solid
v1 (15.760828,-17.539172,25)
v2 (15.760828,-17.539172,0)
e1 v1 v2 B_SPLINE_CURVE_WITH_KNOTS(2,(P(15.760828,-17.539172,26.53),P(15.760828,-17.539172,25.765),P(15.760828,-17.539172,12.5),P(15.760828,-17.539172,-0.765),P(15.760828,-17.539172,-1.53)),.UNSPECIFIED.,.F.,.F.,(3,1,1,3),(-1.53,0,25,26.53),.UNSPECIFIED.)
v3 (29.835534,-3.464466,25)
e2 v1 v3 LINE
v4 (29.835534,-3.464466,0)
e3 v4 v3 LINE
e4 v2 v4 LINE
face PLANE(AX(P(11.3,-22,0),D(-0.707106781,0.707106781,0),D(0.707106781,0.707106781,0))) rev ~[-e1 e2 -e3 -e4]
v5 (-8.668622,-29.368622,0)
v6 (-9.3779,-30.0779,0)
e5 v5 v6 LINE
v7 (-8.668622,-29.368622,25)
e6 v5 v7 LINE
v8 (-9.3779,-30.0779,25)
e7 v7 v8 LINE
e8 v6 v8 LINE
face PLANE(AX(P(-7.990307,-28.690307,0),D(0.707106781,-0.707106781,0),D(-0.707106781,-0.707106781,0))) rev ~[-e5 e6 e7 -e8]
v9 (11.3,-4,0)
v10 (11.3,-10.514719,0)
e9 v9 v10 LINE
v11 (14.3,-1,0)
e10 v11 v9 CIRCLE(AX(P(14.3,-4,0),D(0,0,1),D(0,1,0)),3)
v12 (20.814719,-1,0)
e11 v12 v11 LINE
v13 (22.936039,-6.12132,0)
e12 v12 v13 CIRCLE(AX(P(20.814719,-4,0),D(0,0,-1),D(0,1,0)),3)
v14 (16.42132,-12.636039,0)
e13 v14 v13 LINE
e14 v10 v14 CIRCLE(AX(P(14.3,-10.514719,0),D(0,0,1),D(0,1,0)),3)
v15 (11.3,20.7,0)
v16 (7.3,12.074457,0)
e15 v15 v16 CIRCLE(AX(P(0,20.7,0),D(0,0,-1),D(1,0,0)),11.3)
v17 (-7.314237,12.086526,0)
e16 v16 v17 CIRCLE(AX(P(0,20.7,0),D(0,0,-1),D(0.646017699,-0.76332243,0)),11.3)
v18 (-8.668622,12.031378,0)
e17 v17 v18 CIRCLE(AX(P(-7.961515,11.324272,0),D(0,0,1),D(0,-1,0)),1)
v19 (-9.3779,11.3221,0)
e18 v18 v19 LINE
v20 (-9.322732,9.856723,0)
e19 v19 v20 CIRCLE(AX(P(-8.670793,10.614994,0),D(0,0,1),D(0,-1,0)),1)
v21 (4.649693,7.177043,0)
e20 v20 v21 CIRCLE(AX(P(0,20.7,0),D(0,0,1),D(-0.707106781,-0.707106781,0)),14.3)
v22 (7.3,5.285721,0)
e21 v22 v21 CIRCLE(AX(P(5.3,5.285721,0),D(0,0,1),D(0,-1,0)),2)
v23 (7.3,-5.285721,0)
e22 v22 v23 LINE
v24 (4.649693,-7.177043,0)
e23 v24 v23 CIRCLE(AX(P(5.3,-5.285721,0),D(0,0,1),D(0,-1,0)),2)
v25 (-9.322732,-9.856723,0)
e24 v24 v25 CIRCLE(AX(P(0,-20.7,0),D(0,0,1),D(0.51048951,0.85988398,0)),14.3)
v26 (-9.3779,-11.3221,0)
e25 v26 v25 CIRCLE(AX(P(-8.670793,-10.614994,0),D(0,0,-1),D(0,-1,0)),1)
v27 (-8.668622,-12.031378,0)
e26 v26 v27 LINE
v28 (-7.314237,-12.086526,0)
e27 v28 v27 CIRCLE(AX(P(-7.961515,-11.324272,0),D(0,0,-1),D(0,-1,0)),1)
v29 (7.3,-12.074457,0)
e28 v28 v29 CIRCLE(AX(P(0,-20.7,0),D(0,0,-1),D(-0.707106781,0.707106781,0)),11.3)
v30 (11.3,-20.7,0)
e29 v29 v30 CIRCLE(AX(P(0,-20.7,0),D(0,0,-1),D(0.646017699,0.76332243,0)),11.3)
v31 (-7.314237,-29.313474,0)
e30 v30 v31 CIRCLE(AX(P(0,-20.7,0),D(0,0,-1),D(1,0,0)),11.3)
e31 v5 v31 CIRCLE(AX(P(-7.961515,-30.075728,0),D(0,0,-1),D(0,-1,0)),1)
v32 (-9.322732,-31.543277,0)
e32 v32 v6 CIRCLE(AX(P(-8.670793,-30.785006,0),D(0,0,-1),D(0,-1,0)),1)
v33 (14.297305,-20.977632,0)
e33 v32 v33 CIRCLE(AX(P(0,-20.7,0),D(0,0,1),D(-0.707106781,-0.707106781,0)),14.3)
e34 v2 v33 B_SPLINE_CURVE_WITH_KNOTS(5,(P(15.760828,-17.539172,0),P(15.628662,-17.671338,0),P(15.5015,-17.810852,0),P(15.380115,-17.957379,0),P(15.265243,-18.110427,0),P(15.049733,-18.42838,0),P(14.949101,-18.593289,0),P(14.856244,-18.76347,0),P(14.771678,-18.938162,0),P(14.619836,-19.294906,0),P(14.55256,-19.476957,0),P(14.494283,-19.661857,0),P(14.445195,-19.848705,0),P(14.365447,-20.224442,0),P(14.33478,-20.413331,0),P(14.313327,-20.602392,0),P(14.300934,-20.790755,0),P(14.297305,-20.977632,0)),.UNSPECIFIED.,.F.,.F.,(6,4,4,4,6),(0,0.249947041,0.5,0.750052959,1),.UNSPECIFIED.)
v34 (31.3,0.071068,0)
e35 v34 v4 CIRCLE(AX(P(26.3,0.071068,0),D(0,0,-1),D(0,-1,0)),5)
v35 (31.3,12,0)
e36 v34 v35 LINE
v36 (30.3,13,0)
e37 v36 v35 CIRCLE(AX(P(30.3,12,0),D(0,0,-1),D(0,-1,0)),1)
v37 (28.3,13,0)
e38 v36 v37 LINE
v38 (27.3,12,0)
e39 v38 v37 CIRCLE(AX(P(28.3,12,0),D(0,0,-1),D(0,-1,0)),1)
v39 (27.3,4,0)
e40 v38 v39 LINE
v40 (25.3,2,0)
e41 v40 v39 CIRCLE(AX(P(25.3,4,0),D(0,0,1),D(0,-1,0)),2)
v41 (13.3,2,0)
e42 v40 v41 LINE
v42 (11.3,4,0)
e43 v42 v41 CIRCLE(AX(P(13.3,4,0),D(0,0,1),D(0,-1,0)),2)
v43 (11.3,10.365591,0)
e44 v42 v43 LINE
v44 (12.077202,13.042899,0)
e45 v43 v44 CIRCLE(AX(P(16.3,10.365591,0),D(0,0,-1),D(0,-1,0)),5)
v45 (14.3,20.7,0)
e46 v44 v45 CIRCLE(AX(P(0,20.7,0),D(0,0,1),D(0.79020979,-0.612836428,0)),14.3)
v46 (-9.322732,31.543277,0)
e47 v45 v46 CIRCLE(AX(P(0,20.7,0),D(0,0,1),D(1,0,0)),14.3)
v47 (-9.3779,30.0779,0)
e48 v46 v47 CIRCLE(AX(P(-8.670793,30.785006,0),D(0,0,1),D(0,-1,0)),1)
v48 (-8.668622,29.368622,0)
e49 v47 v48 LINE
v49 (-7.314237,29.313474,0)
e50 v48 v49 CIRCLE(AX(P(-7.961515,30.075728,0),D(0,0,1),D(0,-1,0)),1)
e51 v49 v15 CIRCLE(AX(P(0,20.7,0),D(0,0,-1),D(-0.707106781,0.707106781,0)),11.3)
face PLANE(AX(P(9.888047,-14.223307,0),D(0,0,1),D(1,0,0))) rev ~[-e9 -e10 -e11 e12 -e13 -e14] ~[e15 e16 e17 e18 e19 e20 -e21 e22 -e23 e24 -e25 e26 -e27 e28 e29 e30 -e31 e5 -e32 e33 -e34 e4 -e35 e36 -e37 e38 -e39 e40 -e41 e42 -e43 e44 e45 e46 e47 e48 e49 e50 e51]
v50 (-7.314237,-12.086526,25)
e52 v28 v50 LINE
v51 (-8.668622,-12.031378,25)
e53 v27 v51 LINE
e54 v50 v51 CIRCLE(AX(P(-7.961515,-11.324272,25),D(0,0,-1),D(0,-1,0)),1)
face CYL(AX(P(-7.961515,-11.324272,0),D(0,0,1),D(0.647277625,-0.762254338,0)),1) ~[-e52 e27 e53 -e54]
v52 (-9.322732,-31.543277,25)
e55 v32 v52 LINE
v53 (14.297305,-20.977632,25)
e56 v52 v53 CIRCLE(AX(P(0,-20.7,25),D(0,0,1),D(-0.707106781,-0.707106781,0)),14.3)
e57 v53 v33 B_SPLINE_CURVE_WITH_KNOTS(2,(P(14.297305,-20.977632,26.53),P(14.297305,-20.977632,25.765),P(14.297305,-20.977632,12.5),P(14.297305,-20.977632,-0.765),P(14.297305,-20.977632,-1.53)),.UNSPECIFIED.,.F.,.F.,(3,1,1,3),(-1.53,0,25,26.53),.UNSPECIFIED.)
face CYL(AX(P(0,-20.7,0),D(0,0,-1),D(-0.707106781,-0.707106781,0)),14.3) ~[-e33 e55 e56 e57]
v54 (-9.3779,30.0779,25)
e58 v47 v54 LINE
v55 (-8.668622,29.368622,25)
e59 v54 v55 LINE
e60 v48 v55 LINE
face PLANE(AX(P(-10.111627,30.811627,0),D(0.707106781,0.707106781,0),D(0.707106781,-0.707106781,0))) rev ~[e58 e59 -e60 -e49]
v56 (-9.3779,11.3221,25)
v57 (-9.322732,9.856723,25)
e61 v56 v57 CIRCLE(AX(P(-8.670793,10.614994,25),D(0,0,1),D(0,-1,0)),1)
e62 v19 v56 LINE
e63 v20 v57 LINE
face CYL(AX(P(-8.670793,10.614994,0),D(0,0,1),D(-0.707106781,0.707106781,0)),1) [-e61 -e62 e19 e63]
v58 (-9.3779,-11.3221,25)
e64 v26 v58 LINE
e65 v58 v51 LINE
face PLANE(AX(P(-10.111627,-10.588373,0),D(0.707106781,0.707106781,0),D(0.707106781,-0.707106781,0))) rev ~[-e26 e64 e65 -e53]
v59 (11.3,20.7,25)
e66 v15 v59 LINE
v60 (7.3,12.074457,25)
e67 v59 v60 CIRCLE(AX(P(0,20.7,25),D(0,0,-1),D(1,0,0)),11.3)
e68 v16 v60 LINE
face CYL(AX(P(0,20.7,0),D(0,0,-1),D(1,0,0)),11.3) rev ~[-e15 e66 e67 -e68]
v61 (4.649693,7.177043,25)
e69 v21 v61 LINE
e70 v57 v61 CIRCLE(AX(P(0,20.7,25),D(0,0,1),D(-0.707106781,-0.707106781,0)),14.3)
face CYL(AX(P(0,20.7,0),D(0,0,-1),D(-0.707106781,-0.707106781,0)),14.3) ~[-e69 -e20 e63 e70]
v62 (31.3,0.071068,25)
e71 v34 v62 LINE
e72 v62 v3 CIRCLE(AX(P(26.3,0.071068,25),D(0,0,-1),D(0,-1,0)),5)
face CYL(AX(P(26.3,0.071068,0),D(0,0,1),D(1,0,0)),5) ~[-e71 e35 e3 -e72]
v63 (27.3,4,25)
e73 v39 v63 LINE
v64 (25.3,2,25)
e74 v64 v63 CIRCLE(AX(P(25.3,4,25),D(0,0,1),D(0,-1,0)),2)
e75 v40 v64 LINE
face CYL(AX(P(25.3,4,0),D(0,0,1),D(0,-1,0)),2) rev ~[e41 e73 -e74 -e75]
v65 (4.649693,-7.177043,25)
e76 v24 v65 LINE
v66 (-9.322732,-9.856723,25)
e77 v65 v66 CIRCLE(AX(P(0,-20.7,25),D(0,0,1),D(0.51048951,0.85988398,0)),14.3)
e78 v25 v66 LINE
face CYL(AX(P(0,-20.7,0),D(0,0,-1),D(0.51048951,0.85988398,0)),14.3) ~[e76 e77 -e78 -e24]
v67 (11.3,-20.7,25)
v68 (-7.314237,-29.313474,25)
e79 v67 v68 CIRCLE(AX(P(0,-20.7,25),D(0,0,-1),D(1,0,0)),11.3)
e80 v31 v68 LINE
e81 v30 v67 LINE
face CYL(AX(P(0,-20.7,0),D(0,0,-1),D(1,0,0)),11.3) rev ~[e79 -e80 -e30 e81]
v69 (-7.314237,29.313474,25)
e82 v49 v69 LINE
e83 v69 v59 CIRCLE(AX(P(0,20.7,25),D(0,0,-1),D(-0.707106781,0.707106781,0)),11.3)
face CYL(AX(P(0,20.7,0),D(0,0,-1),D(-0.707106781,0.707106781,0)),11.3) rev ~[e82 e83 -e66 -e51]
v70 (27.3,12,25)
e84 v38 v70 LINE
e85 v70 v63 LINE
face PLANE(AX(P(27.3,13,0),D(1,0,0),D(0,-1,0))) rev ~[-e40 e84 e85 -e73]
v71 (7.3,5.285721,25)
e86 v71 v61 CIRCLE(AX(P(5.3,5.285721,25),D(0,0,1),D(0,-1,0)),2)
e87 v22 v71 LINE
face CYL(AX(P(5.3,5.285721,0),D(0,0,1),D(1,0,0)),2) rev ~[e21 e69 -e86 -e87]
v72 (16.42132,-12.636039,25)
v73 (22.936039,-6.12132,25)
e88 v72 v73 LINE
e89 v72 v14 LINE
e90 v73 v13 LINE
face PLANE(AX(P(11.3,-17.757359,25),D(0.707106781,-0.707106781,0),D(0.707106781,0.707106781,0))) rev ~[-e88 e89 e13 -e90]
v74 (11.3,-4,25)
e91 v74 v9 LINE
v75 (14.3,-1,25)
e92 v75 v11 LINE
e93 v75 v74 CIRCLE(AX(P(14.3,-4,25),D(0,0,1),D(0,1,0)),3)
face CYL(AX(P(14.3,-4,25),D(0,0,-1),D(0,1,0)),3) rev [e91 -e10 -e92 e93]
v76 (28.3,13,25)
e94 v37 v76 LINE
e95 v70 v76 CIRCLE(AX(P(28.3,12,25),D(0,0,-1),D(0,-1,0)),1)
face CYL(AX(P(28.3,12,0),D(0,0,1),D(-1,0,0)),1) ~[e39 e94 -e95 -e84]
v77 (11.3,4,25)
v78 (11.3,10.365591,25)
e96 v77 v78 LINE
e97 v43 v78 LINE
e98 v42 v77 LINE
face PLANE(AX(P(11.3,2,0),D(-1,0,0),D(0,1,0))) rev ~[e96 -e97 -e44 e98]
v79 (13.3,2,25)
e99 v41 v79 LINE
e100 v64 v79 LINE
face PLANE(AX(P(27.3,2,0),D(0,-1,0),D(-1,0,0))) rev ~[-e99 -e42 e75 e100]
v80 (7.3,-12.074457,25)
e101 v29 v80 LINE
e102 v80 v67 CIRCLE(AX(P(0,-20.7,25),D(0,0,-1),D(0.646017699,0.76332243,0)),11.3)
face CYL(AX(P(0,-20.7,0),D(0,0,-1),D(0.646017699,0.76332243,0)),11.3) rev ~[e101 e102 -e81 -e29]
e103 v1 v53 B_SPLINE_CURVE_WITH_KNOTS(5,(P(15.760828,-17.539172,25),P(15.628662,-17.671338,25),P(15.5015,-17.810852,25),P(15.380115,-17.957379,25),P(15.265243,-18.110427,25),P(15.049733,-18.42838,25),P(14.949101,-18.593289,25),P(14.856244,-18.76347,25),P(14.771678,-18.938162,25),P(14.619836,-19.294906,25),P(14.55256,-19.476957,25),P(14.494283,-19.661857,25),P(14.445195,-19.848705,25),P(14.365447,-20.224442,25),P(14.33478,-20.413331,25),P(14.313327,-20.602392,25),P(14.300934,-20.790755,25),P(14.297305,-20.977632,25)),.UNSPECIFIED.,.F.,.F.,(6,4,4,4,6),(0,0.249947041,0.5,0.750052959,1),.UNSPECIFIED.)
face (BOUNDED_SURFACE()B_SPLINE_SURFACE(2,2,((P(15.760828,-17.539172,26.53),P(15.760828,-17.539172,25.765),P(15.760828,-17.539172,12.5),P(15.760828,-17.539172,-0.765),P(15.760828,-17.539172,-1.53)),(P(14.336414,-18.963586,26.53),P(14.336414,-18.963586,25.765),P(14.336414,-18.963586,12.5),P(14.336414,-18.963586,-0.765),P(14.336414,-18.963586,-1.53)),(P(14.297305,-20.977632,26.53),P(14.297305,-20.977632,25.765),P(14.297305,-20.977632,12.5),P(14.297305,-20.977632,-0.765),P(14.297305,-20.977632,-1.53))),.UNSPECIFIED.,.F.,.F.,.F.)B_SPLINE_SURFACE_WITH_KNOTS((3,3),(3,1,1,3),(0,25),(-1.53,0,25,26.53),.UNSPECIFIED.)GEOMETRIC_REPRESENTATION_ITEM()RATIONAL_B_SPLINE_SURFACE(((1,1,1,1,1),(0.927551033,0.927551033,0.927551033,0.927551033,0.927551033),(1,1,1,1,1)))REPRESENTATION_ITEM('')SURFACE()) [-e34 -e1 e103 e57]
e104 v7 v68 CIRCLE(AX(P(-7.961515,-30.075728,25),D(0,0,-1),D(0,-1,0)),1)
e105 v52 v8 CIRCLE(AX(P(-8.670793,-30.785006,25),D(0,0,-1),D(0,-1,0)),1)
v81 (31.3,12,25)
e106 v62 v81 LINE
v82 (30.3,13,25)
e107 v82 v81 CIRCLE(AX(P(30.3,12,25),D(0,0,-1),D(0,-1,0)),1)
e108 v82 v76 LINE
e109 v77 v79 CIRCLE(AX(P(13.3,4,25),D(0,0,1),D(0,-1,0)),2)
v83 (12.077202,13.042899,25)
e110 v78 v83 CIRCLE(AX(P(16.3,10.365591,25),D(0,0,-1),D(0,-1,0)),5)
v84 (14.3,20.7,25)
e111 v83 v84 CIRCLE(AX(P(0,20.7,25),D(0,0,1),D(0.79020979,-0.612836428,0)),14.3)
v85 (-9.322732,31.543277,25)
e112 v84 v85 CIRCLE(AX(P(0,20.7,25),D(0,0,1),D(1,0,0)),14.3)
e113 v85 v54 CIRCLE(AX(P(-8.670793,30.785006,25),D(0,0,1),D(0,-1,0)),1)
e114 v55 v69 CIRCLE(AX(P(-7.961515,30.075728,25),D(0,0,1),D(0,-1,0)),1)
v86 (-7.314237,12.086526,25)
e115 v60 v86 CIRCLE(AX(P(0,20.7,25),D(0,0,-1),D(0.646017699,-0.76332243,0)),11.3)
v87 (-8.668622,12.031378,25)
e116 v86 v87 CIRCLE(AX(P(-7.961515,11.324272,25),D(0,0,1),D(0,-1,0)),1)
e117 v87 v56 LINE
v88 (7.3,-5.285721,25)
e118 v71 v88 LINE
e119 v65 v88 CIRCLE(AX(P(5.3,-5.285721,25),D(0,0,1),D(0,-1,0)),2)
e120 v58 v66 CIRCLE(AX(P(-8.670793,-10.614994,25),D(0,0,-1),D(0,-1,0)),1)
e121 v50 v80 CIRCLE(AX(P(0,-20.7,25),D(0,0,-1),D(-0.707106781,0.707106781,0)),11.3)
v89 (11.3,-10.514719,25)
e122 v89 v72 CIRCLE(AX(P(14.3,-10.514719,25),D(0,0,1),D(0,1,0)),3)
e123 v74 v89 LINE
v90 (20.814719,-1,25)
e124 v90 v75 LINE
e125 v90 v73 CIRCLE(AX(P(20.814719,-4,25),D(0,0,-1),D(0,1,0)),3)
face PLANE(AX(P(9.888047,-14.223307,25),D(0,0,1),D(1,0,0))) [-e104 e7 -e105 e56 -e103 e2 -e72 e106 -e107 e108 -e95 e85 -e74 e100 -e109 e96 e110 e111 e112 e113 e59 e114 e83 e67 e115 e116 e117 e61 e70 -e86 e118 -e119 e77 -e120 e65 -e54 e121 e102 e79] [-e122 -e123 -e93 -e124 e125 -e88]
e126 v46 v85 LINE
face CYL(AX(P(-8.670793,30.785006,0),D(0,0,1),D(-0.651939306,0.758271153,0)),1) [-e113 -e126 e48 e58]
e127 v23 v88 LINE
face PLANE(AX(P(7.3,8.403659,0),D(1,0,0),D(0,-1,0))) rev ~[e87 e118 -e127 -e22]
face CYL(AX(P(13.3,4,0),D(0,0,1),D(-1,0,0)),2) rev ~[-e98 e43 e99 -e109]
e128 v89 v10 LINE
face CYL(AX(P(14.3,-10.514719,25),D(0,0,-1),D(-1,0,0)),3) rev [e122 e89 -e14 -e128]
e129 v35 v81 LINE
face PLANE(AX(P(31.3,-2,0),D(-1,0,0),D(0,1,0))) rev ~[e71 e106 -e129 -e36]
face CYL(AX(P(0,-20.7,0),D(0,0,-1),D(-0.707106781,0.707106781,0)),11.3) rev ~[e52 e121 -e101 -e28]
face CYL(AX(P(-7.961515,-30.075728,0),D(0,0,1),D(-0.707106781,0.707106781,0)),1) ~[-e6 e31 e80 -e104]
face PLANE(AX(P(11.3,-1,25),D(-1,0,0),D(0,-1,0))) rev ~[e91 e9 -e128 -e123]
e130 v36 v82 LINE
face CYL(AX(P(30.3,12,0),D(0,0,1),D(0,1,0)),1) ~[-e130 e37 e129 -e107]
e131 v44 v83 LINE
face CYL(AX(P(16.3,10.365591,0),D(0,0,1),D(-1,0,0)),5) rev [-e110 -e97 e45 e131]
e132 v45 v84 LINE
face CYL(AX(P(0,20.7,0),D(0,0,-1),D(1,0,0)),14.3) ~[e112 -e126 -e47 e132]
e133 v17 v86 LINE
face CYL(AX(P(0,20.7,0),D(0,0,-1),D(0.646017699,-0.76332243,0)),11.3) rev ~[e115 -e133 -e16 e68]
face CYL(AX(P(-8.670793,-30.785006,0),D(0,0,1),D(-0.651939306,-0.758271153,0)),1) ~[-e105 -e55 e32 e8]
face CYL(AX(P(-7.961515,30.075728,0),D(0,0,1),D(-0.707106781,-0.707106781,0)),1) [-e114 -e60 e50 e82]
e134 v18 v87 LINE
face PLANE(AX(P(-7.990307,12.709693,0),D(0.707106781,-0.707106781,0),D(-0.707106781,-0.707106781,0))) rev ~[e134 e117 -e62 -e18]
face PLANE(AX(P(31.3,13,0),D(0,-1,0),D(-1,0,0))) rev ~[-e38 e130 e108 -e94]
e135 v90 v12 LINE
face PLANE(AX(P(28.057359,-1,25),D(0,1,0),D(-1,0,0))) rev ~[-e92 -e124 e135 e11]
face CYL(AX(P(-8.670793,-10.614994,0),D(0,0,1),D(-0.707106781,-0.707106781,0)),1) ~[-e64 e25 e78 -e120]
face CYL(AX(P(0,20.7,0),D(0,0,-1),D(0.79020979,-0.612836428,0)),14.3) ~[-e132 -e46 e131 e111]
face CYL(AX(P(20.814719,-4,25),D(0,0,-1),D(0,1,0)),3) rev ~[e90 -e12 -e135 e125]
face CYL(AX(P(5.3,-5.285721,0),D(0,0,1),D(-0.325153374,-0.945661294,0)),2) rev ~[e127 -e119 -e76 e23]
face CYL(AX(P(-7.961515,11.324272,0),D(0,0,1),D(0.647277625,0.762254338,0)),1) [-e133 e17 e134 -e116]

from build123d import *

# Parameters (mm, degrees)
F1_DEPTH    = 25
F2_T4_DEPTH = 25
F3_R        = 2
F4_R        = 1
F5_R        = 5
F6_R        = 2
F8_DEPTH    = 25.001
F9_R        = 3


# Not quite as in the source:
# - a fillet or chamfer that OpenCascade refuses, or shapes differently, is made with other operations: its cross-section is extruded or revolved along the edge and cut away or added


with BuildPart() as f1:
    # F0 (on Top) → F1 (new body)
    with BuildSketch(Plane.XY):
        with BuildLine():
            ThreePointArc((11.3, -11.9364390799), (9.4662629179, -9.9817974282), (7.3, -8.4036590808))
            Line((7.3, -8.4036590808), (7.3, -12.0744565389))
            ThreePointArc((7.3, -12.0744565389), (10.2513413756, -15.9460542704), (11.3, -20.7))
            Line((11.3, -20.7), (11.3, -11.9364390799))
        make_face()
        with BuildLine():
            ThreePointArc((11.3, 11.9364390799), (9.4662629179, 9.9817974282), (7.3, 8.4036590808))
            Line((7.3, 8.4036590808), (7.3, -8.4036590808))
            ThreePointArc((7.3, -8.4036590808), (9.4662629179, -9.9817974282), (11.3, -11.9364390799))
            Line((11.3, -11.9364390799), (11.3, -2))
            Line((11.3, -2), (11.3, 2))
            Line((11.3, 2), (11.3, 11.9364390799))
        make_face()
        with BuildLine():
            ThreePointArc((11.3, 20.7), (10.2513413756, 15.9460542704), (7.3, 12.0744565389))
            Line((7.3, 12.0744565389), (7.3, 8.4036590808))
            ThreePointArc((7.3, 8.4036590808), (9.4662629179, 9.9817974282), (11.3, 11.9364390799))
            Line((11.3, 11.9364390799), (11.3, 20.7))
        make_face()
        with BuildLine():
            ThreePointArc((-7.9903066274, 28.6903066274), (4.3243227857, 31.1398387174), (11.3, 20.7))
            Line((11.3, 20.7), (11.3, 11.9364390799))
            ThreePointArc((11.3, 11.9364390799), (13.5292276202, 16.0685855292), (14.3, 20.7))
            ThreePointArc((14.3, 20.7), (5.4723730828, 33.9114773149), (-10.111626971, 30.811626971))
            Line((-10.111626971, 30.811626971), (-7.9903066274, 28.6903066274))
        make_face()
        with BuildLine():
            Line((7.3, 8.4036590808), (7.3, 12.0744565389))
            ThreePointArc((7.3, 12.0744565389), (-0.4690546543, 9.4097392532), (-7.9903066274, 12.7096933726))
            Line((-7.9903066274, 12.7096933726), (-10.111626971, 10.588373029))
            ThreePointArc((-10.111626971, 10.588373029), (-1.7803244971, 6.5112564092), (7.3, 8.4036590808))
        make_face()
        with BuildLine():
            Line((7.3, -12.0744565389), (7.3, -8.4036590808))
            ThreePointArc((7.3, -8.4036590808), (-1.7803244971, -6.5112564092), (-10.111626971, -10.588373029))
            Line((-10.111626971, -10.588373029), (-7.9903066274, -12.7096933726))
            ThreePointArc((-7.9903066274, -12.7096933726), (-0.4690546543, -9.4097392532), (7.3, -12.0744565389))
        make_face()
        with BuildLine():
            ThreePointArc((14.3, -20.7), (13.5292276202, -16.0685855292), (11.3, -11.9364390799))
            Line((11.3, -11.9364390799), (11.3, -20.7))
            ThreePointArc((11.3, -20.7), (4.3243227857, -31.1398387174), (-7.9903066274, -28.6903066274))
            Line((-7.9903066274, -28.6903066274), (-10.111626971, -30.811626971))
            ThreePointArc((-10.111626971, -30.811626971), (5.4723730828, -33.9114773149), (14.3, -20.7))
        make_face()
        Polygon((27.3, 2), (11.3, 2), (11.3, -2), (31.3, -2), (31.3, 13), (27.3, 13), align=None)
    extrude(amount=F1_DEPTH)

    # F2: chamfer of 20 on 1 edges, made by hand


with BuildPart() as f2_tool2:
    # F2_s3 → F2_t4 (new body)
    with BuildSketch(Plane.XY):
        Polygon((11.3, -22), (31.3, -2), (11.3, -2), align=None)
    extrude(amount=F2_T4_DEPTH)

    split(bisect_by=Plane.YZ.offset(31.3), keep=Keep.BOTTOM)


with BuildPart() as f1_1:
    add(f1.part)

    # F2_t1: union F2_tool2
    add(f2_tool2.part)

    # F3
    f3_edges = [f1_1.edges().sort_by_distance(p)[0] for p in [
        (27.3, 2, 12.5),
        (11.3, 2, 12.5),
    ]]
    fillet(f3_edges, radius=F3_R)

    # F4
    f4_edges = [f1_1.edges().sort_by_distance(p)[0] for p in [
        (31.3, 13, 12.5),
        (27.3, 13, 12.5),
        (-7.990307, -12.709693, 12.5),
        (-10.111627, -10.588373, 12.5),
        (-7.990307, -28.690307, 12.5),
        (-10.111627, -30.811627, 12.5),
        (-10.111627, 10.588373, 12.5),
        (-7.990307, 12.709693, 12.5),
        (-7.990307, 28.690307, 12.5),
        (-10.111627, 30.811627, 12.5),
    ]]
    fillet(f4_edges, radius=F4_R)

    # F5
    f5_edges = [f1_1.edges().sort_by_distance(p)[0] for p in [
        (11.3, 11.936439, 12.5),
        (31.3, -2, 12.5),
        (14.209172, -19.090828, 12.5),
    ]]
    fillet(f5_edges, radius=F5_R)

    # F6
    f6_edges = [f1_1.edges().sort_by_distance(p)[0] for p in [
        (7.3, 8.403659, 12.5),
        (7.3, -8.403659, 12.5),
    ]]
    fillet(f6_edges, radius=F6_R)

    # F7 (on face) → F8 (cut, through all)
    with BuildSketch(Plane.XY.offset(25)):
        Polygon((28.0573593129, -1), (11.3, -1), (11.3, -17.7573593129), align=None)
    extrude(amount=-F8_DEPTH, mode=Mode.SUBTRACT)

    # F9
    f9_edges = [f1_1.edges().sort_by_distance(p)[0] for p in [
        (11.3, -1, 12.5),
        (28.057359, -1, 12.5),
        (11.3, -17.757359, 12.5),
    ]]
    fillet(f9_edges, radius=F9_R)


solid = f1_1.part
